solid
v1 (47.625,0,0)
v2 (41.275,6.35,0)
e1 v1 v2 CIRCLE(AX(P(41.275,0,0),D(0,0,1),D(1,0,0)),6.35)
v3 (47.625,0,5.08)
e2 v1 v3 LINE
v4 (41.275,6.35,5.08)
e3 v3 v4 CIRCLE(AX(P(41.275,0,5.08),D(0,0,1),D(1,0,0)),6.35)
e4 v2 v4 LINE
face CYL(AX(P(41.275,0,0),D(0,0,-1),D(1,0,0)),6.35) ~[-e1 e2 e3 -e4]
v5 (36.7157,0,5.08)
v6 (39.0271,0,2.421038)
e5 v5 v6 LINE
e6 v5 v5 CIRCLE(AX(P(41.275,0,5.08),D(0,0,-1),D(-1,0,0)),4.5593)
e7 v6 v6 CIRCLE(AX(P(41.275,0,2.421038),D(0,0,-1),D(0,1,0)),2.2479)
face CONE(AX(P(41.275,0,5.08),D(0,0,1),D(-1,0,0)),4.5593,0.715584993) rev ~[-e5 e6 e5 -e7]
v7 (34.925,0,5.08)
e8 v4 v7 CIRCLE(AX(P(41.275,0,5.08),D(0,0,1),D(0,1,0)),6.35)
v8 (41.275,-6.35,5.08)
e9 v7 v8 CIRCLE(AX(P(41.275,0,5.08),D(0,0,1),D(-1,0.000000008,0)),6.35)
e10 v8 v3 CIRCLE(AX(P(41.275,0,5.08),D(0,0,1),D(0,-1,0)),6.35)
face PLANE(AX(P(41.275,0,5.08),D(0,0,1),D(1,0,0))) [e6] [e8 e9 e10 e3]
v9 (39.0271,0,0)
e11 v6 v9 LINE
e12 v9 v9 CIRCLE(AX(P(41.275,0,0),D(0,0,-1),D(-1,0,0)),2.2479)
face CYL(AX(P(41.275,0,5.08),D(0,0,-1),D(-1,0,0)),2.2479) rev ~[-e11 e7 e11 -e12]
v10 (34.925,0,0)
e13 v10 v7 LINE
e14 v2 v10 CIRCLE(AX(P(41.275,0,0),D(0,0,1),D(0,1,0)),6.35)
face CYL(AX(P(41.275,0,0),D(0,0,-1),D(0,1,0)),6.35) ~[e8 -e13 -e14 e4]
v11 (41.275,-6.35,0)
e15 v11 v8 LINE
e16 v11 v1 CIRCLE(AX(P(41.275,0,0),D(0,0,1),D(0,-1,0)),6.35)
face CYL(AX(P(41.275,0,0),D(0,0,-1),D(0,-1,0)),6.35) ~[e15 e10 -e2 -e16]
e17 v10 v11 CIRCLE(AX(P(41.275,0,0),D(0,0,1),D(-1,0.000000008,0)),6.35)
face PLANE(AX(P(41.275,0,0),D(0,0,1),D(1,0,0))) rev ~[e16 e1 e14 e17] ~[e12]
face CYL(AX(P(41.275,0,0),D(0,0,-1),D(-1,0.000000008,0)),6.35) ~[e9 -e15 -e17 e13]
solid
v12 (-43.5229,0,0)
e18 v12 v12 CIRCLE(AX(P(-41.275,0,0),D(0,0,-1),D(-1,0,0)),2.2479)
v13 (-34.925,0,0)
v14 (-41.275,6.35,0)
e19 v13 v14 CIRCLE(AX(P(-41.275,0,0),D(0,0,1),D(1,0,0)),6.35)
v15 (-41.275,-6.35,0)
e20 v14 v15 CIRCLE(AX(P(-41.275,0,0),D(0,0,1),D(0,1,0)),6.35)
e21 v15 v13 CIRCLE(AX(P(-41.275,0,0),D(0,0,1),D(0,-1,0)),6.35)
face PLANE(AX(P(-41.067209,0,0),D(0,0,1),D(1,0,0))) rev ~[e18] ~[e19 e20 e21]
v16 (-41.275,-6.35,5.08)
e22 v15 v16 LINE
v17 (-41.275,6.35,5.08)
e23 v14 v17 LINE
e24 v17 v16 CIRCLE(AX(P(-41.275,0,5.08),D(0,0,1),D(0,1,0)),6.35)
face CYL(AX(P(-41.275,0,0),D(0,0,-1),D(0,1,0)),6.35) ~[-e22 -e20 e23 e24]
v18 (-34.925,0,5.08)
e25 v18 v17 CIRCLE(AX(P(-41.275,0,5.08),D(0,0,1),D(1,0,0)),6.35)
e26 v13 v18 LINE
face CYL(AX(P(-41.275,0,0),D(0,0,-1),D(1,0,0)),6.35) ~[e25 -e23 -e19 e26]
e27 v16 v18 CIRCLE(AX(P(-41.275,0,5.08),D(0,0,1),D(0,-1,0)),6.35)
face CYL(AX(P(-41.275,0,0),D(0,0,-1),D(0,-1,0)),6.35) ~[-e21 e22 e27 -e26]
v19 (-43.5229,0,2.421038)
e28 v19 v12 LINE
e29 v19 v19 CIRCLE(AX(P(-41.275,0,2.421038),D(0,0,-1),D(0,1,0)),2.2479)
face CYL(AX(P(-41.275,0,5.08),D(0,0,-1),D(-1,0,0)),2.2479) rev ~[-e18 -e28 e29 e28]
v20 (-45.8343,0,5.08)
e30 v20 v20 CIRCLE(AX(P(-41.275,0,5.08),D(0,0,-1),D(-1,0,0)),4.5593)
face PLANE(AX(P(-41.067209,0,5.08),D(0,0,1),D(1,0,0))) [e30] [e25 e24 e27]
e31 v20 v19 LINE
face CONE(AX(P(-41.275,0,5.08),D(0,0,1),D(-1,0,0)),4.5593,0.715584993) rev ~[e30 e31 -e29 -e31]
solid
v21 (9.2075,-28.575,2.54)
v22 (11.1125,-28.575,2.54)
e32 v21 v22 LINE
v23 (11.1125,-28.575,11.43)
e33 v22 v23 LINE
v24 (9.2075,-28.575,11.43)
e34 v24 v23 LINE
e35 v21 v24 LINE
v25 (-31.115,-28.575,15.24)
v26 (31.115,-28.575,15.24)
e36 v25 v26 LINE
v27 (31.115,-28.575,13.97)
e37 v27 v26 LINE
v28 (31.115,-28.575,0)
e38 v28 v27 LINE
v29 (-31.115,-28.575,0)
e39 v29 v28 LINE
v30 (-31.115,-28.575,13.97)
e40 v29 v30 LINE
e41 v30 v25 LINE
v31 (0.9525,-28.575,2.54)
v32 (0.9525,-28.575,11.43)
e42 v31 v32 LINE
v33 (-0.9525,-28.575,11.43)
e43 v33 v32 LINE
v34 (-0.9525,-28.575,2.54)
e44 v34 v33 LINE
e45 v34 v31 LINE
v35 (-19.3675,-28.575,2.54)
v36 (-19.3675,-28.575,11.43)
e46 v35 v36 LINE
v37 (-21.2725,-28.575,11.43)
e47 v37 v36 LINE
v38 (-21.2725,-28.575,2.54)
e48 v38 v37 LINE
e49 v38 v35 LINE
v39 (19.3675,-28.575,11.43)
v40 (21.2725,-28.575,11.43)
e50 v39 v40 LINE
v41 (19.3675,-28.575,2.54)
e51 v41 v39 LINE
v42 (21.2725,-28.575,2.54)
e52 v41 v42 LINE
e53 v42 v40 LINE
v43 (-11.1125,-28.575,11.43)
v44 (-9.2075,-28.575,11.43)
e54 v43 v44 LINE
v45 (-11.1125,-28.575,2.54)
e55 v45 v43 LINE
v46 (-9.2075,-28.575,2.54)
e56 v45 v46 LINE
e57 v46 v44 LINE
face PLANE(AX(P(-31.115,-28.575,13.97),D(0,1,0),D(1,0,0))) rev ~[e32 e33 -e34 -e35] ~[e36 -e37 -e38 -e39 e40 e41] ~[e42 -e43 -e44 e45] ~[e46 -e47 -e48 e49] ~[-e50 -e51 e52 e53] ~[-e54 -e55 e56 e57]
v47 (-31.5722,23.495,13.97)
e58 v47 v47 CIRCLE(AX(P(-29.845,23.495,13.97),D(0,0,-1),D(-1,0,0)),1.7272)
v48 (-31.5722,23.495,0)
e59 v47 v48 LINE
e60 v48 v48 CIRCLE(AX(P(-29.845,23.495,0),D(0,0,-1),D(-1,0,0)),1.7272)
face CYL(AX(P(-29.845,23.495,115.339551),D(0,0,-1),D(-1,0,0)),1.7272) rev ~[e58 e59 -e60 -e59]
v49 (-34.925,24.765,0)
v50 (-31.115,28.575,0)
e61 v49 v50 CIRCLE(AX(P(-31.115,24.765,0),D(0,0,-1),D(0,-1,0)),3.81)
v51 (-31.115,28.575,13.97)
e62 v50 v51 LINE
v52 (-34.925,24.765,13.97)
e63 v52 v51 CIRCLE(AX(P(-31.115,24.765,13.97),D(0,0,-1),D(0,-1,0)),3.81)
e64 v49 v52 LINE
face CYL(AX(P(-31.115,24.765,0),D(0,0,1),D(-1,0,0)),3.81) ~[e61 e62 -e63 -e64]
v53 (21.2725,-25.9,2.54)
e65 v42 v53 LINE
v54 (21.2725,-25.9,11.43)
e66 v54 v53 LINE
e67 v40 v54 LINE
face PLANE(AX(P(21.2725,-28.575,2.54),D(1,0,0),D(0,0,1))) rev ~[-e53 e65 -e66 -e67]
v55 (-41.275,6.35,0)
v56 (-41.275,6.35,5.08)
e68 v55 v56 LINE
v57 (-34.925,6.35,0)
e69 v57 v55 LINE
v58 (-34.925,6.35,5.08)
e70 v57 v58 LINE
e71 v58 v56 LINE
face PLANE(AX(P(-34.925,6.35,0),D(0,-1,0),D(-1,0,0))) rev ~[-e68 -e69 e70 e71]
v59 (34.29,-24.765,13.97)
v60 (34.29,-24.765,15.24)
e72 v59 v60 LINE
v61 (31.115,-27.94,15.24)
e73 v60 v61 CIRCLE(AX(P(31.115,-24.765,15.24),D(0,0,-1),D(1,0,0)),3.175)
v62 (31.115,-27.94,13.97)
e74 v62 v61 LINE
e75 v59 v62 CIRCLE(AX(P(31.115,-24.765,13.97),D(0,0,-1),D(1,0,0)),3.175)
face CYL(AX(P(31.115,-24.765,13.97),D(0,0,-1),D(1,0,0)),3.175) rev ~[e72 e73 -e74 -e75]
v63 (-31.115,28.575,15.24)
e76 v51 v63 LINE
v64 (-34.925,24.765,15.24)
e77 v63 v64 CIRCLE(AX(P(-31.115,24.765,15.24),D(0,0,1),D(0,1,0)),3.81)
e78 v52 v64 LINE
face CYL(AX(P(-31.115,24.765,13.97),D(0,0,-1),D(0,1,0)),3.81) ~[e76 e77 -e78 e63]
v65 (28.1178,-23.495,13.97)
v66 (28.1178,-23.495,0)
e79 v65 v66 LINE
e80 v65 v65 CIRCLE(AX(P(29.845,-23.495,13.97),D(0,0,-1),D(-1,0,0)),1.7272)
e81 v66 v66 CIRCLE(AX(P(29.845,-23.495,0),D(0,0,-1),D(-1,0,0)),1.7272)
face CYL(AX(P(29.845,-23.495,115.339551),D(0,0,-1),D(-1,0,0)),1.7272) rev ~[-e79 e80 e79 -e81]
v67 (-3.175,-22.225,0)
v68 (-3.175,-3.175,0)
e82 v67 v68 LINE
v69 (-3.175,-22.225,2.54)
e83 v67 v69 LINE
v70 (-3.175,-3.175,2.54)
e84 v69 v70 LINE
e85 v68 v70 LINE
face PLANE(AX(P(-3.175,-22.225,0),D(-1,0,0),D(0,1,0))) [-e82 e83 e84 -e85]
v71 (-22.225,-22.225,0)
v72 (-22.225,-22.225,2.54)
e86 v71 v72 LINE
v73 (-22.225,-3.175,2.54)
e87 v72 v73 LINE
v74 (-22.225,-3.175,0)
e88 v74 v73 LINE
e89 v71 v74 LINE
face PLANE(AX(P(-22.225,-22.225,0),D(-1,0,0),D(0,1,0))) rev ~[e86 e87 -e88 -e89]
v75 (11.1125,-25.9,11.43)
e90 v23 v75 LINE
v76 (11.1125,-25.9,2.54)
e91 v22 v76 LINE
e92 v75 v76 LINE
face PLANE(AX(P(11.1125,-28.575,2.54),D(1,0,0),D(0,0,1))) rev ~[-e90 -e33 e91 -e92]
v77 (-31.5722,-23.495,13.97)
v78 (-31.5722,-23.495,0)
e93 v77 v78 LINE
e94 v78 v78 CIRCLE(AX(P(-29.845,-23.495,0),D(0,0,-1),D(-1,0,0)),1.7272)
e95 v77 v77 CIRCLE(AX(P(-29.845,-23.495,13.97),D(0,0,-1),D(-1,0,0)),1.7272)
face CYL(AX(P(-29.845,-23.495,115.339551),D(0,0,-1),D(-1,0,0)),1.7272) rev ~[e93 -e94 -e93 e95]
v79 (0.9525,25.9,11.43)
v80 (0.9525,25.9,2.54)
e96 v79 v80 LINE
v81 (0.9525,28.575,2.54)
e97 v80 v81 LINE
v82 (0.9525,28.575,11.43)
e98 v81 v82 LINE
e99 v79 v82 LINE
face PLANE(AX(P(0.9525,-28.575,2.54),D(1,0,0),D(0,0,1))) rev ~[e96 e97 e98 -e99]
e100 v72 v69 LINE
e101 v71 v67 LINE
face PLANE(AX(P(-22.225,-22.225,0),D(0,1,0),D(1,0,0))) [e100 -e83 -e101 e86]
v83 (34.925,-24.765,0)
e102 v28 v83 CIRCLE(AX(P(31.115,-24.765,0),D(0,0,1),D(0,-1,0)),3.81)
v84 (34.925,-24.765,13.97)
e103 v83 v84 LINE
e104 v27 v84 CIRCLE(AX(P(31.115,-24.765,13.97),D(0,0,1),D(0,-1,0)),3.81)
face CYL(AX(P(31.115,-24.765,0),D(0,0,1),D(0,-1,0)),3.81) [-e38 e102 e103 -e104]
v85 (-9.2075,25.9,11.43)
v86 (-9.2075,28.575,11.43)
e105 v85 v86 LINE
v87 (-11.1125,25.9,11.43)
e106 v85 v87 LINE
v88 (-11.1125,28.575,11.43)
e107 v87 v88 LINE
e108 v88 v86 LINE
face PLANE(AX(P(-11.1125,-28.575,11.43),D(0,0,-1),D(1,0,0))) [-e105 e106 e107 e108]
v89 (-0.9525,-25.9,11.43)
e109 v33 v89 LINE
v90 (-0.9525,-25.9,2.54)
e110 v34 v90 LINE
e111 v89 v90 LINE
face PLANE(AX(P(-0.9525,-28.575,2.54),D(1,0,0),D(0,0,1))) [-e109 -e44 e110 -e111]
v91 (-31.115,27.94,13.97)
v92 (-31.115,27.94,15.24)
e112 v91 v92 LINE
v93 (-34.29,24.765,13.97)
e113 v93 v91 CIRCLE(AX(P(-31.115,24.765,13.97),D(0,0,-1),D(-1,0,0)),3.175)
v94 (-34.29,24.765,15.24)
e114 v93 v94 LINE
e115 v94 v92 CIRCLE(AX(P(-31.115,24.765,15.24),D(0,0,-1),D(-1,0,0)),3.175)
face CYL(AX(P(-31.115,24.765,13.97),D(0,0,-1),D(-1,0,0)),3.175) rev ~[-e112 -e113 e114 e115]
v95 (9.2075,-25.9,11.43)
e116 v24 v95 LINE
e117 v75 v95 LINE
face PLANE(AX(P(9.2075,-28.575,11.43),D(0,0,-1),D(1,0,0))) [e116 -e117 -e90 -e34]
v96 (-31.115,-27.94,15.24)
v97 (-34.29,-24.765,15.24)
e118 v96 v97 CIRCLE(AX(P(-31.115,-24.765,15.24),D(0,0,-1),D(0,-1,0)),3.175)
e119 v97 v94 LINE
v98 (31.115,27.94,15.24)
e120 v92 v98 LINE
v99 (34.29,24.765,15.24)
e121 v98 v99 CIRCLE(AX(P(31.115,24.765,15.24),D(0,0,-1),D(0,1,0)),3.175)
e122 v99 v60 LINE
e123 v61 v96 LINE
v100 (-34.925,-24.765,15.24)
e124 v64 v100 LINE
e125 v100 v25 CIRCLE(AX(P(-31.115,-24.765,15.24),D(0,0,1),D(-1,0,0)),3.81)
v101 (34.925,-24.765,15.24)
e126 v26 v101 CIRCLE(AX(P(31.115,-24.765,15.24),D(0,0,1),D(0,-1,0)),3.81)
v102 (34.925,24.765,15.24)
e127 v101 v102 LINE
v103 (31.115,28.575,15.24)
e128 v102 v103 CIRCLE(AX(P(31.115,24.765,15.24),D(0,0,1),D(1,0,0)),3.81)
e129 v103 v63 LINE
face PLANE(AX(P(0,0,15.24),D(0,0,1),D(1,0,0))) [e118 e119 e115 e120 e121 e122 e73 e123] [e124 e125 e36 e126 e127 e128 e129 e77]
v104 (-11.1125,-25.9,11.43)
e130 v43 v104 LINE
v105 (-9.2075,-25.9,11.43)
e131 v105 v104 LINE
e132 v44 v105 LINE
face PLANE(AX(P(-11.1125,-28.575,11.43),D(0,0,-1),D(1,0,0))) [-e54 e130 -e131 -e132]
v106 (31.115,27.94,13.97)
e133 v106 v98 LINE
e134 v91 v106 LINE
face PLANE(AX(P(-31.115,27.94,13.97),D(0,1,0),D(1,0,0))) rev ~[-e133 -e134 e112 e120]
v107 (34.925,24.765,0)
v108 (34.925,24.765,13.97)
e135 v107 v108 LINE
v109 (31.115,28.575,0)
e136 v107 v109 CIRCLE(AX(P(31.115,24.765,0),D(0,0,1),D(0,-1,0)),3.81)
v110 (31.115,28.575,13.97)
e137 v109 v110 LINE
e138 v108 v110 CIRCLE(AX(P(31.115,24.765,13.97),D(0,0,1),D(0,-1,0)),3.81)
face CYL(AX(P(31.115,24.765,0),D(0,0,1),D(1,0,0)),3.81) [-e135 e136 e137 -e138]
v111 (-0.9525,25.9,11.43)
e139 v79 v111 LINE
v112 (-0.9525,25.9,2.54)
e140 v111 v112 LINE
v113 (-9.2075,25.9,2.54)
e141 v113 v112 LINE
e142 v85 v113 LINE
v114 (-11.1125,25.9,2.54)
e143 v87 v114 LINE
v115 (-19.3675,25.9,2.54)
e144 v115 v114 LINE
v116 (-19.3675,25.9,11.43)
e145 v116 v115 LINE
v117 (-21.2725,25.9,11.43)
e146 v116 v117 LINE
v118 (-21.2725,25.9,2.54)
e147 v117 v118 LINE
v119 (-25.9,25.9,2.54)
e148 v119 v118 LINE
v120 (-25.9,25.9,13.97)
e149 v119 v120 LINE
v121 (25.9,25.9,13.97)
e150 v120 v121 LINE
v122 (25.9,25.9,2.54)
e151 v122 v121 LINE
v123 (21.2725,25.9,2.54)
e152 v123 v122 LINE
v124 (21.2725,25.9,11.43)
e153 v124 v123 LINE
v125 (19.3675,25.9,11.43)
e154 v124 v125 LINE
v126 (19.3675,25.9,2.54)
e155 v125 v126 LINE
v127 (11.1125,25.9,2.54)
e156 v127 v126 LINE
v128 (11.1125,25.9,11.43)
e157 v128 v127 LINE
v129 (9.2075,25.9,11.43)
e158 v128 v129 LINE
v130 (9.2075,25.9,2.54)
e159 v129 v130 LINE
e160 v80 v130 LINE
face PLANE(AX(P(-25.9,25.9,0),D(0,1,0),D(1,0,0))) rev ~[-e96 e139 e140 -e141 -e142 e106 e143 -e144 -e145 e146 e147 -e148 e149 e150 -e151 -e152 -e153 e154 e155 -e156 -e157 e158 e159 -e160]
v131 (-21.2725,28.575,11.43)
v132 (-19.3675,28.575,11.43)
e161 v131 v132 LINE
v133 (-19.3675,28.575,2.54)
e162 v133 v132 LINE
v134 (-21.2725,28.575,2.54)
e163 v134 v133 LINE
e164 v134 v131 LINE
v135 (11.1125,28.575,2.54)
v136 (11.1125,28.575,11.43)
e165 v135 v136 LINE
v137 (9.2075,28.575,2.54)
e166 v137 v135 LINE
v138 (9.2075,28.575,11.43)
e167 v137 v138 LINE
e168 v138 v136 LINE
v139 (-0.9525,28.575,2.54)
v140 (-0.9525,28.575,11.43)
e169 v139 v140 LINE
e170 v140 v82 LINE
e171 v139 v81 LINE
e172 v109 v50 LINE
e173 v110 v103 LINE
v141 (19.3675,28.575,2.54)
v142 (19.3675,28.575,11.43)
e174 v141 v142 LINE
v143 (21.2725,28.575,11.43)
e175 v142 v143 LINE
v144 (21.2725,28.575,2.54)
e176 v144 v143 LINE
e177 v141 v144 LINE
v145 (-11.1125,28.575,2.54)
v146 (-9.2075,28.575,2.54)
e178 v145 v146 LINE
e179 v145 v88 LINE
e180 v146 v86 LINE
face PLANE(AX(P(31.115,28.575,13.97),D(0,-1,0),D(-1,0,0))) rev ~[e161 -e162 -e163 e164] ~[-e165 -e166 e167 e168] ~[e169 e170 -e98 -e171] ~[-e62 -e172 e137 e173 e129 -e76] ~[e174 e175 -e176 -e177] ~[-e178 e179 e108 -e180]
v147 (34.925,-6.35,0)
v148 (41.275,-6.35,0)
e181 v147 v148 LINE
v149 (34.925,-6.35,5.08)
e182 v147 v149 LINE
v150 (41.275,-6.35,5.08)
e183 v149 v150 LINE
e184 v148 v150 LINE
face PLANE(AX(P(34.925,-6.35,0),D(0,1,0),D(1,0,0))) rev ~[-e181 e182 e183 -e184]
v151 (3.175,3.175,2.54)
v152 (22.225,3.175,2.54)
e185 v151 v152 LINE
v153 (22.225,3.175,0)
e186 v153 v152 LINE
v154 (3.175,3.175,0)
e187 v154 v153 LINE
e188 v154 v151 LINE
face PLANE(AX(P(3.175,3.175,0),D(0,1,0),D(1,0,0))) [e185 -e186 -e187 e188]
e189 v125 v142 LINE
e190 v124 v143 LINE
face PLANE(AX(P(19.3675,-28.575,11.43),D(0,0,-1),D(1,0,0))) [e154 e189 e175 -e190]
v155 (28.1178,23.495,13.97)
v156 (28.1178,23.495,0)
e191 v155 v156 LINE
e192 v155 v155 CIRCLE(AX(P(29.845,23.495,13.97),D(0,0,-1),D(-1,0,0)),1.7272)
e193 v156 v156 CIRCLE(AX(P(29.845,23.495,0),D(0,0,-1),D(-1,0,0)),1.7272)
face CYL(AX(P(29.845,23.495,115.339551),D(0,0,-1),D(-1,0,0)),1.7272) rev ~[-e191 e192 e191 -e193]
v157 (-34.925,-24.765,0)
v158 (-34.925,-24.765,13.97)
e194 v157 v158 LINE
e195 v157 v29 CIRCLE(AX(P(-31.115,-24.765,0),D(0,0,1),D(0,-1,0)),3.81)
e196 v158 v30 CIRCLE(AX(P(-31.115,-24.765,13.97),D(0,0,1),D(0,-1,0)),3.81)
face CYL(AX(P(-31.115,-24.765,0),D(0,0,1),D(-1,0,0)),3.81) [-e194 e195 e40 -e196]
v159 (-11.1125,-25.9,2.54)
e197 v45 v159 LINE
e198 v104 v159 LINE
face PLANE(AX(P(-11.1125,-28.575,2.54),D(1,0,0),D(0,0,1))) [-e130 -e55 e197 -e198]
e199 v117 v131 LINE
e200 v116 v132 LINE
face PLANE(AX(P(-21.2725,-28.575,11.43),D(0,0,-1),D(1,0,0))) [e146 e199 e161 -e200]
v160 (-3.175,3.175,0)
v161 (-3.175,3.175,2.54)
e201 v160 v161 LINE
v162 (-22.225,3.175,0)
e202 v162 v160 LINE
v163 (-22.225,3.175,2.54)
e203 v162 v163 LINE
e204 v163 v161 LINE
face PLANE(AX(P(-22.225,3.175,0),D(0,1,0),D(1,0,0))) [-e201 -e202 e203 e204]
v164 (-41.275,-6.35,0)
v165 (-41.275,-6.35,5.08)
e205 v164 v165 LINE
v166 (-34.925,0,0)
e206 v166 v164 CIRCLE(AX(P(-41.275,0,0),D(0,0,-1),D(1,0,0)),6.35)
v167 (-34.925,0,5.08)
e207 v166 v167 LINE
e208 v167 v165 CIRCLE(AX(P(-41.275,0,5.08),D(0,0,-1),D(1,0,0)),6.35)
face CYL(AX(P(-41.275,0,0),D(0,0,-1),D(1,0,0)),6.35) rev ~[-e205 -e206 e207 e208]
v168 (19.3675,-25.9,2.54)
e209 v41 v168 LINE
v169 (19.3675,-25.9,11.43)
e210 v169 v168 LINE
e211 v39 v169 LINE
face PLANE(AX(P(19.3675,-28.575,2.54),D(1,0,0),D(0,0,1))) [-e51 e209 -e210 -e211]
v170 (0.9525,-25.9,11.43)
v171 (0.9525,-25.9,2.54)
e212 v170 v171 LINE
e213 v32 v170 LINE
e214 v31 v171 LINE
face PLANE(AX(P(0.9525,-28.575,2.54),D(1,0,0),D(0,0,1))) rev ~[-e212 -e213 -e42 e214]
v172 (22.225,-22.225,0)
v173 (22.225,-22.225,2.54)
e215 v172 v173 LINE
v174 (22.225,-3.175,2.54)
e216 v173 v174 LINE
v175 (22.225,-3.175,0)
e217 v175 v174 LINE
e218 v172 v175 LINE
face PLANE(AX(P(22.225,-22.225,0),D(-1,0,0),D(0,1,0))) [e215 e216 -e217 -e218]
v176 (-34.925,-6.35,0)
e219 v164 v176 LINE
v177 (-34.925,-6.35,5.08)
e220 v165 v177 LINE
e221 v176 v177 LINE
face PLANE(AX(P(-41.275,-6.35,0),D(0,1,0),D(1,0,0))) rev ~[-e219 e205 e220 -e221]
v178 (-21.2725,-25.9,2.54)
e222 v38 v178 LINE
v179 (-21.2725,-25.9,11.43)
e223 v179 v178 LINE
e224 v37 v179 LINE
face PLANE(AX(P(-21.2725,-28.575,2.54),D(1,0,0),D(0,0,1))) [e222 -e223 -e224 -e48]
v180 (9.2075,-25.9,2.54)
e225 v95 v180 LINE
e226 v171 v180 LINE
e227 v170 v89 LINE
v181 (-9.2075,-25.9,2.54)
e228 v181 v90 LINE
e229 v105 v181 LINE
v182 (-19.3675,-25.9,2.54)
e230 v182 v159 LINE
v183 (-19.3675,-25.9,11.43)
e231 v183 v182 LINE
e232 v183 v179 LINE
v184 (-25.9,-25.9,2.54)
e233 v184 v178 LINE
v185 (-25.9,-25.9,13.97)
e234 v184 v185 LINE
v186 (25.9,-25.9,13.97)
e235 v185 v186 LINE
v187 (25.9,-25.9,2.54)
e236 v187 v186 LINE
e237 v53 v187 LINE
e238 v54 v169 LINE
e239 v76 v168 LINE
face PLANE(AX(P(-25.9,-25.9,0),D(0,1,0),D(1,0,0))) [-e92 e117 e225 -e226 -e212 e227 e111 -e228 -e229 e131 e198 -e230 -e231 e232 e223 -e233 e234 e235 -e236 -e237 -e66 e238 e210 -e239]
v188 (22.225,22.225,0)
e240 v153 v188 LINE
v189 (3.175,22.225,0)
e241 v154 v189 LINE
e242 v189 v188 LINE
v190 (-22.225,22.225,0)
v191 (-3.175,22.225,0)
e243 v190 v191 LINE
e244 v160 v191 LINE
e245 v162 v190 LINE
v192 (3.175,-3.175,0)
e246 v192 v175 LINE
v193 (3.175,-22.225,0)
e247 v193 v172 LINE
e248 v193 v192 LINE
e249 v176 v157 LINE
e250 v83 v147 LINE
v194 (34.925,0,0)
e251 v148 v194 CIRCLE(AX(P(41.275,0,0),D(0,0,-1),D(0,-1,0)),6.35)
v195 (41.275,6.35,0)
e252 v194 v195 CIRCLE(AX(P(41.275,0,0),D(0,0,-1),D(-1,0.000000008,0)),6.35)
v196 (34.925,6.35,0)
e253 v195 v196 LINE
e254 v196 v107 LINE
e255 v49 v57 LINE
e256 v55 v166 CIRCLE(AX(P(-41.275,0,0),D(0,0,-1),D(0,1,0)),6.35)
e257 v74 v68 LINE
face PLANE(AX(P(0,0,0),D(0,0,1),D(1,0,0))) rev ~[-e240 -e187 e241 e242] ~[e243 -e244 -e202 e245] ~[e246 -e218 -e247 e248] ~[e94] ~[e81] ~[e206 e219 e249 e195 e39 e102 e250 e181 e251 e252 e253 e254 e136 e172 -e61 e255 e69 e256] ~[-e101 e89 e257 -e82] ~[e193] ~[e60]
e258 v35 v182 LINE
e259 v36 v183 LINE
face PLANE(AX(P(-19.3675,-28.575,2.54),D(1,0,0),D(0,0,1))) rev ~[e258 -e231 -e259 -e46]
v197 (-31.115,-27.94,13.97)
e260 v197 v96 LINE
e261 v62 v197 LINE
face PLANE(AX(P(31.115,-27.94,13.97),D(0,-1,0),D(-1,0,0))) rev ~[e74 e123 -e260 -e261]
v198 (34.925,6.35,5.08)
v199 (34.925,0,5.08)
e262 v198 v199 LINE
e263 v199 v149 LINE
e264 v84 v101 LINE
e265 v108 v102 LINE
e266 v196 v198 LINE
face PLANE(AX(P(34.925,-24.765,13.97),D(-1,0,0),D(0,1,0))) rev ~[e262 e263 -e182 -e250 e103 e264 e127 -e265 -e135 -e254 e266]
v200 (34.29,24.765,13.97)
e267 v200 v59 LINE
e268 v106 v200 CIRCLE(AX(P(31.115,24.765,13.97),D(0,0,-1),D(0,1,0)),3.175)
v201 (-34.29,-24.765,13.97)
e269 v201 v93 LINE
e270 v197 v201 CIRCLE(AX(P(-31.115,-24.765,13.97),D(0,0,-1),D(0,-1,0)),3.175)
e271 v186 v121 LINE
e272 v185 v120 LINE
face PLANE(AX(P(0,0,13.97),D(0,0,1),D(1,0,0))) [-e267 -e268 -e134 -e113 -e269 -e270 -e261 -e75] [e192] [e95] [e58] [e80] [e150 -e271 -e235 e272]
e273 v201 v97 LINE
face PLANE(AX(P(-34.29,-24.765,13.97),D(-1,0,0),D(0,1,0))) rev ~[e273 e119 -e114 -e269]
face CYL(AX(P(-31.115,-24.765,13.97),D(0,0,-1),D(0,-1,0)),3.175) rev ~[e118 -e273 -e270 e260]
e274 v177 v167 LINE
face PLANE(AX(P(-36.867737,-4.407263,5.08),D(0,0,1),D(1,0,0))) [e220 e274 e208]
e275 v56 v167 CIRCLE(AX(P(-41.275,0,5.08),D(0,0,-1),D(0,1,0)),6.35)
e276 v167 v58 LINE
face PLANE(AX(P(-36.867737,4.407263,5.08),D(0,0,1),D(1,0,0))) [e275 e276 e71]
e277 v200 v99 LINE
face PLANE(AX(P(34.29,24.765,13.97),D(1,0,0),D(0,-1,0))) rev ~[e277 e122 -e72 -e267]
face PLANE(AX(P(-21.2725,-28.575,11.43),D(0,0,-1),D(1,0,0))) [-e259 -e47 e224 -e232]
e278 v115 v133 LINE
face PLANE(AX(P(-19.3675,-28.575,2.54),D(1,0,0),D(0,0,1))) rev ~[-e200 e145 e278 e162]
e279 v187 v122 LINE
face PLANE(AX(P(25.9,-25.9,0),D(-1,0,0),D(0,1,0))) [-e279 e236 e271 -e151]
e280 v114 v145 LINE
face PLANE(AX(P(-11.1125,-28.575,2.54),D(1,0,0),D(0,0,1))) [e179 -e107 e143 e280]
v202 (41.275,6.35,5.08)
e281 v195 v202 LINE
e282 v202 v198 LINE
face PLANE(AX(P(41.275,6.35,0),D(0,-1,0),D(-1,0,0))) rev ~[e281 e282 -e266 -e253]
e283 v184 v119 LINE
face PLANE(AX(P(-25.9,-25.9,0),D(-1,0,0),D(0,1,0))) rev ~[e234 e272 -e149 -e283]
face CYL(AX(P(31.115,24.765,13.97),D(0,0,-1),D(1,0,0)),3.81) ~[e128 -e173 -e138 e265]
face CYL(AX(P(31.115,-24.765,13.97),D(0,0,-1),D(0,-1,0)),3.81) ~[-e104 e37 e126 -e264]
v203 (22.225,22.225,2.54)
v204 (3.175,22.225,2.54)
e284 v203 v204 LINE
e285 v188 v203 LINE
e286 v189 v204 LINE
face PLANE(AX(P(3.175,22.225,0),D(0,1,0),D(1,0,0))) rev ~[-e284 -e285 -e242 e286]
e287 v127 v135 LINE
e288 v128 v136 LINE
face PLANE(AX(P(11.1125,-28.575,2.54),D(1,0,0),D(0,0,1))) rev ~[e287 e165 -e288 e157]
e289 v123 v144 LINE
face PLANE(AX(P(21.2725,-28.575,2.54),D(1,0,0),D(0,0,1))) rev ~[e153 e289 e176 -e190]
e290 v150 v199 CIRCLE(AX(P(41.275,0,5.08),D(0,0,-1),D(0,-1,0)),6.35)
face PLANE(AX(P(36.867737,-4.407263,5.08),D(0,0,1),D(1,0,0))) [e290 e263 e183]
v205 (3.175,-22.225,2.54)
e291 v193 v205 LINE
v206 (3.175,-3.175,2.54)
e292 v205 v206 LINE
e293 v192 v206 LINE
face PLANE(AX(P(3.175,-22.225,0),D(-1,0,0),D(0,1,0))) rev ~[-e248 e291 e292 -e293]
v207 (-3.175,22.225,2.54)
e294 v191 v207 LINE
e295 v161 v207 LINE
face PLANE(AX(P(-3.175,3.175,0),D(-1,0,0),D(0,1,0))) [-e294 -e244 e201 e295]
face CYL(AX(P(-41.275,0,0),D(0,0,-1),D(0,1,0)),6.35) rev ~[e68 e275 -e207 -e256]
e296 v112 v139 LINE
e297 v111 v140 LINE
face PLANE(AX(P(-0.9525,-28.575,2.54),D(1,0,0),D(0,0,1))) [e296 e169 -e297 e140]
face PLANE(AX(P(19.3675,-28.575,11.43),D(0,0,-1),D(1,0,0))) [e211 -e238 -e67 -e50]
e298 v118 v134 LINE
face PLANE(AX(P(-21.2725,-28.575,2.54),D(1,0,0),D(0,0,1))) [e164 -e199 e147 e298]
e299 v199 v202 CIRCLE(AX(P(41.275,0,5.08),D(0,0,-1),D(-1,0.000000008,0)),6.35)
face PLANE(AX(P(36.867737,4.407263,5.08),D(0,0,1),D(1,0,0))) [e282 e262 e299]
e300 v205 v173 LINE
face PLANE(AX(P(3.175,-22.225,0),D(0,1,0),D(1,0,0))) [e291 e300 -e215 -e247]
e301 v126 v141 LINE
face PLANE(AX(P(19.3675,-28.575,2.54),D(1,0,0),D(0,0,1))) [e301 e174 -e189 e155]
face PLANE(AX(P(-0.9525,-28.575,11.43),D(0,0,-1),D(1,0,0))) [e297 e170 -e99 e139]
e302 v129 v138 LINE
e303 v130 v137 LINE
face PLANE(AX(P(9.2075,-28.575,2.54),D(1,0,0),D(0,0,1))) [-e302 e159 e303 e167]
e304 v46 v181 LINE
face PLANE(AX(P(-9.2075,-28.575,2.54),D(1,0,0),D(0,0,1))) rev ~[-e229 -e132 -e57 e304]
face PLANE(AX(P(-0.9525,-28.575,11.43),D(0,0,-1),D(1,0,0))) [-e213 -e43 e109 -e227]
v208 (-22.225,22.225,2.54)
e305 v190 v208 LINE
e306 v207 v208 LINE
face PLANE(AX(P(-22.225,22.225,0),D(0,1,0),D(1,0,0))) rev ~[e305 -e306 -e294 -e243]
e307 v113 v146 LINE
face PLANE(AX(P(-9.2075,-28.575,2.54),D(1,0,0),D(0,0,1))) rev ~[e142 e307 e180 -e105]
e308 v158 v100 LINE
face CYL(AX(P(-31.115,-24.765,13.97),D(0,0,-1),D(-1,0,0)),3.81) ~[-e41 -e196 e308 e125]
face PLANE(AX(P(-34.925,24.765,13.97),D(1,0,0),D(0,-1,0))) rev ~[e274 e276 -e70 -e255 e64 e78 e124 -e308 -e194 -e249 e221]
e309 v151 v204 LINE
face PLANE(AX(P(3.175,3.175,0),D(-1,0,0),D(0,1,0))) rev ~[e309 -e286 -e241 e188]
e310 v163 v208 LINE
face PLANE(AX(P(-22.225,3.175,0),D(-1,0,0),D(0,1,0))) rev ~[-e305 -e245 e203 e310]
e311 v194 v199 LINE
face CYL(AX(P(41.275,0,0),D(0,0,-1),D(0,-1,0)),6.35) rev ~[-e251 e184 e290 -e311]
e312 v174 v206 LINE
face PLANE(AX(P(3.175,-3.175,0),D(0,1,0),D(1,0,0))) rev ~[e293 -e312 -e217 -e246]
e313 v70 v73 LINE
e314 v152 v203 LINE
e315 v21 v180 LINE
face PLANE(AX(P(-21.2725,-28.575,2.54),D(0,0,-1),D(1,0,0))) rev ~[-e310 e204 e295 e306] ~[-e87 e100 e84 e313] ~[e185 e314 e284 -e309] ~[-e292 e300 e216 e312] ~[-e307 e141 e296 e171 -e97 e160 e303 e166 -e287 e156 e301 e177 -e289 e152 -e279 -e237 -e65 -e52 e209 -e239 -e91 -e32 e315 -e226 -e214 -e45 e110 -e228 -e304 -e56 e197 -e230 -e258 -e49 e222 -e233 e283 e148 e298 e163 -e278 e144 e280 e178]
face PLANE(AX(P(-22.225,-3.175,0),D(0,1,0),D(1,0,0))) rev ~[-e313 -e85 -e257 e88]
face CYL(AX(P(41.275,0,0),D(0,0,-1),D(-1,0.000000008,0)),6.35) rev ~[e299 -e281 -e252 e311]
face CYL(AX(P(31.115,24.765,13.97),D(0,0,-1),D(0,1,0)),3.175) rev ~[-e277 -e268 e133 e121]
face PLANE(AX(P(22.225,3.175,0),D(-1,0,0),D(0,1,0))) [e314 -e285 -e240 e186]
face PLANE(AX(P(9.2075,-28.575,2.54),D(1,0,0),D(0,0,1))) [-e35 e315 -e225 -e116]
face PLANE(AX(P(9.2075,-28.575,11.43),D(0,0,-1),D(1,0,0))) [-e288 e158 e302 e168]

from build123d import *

# Parameters (mm, degrees)
F0_W              = 51.8
F0_H              = 51.8
F1_DEPTH          = 13.97
F2_DEPTH          = 5.08
F0_W_2            = 19.05
F0_H_2            = 19.05
F3_DEPTH          = 2.54
F4_R              = 3.81
F7_D              = 3.4544
F9_W              = 1.905
F9_H              = 8.89
F10_DEPTH         = 57.15
F11_DEPTH         = 5.08
F14_D             = 4.4958
F14_CSINK_D       = 9.1186
F14_CSINK_ANGLE   = 82
F14_2_D           = 4.4958
F14_2_CSINK_D     = 9.1186
F14_2_CSINK_ANGLE = 82
F16_DEPTH         = 1.27


# Not quite as in the source:
# - a feature names something its author has since deleted; it is built from what else it names


with BuildPart() as f1:
    # F0 (on Top) → F1 (new body)
    with BuildSketch(Plane.XY):
        Polygon((-34.925, -28.575), (34.925, -28.575), (34.925, -6.35), (34.925, 4.95e-08), (34.925, 6.35), (34.925, 28.575), (-34.925, 28.575), (-34.925, 6.35), (-34.925, 0), (-34.925, -6.35), align=None)
        Rectangle(F0_W, F0_H, mode=Mode.SUBTRACT)
    extrude(amount=F1_DEPTH)

    # F0 (on Top) → F2 (join)
    with BuildSketch(Plane.XY):
        with BuildLine():
            ThreePointArc((-41.275, 6.35), (-36.7848719395, 4.4901280605), (-34.925, 0))
            Line((-34.925, 0), (-34.925, 6.35))
            Line((-34.925, 6.35), (-41.275, 6.35))
        make_face()
        with BuildLine():
            Line((34.925, 6.35), (34.925, 4.95e-08))
            ThreePointArc((34.925, 4.95e-08), (36.784871957, 4.490128078), (41.275, 6.35))
            Line((41.275, 6.35), (34.925, 6.35))
        make_face()
        with BuildLine():
            Line((34.925, 4.95e-08), (34.925, -6.35))
            Line((34.925, -6.35), (41.275, -6.35))
            ThreePointArc((41.275, -6.35), (36.784871922, -4.490128043), (34.925, 4.95e-08))
        make_face()
        with BuildLine():
            Line((-41.275, -6.35), (-34.925, -6.35))
            Line((-34.925, -6.35), (-34.925, 0))
            ThreePointArc((-34.925, 0), (-36.7848719395, -4.4901280605), (-41.275, -6.35))
        make_face()
    extrude(amount=F2_DEPTH)

    # F0 (on Top) → F3 (join)
    with BuildSketch(Plane.XY):
        Rectangle(F0_W, F0_H)
        with Locations((-12.7, -12.7)):
            Rectangle(F0_W_2, F0_H_2, mode=Mode.SUBTRACT)
        with Locations((12.7, -12.7)):
            Rectangle(F0_W_2, F0_H_2, mode=Mode.SUBTRACT)
        with Locations((-12.7, 12.7)):
            Rectangle(F0_W_2, F0_H_2, mode=Mode.SUBTRACT)
        with Locations((12.7, 12.7)):
            Rectangle(F0_W_2, F0_H_2, mode=Mode.SUBTRACT)
    extrude(amount=F3_DEPTH)

    # F4
    f4_edges = [f1.edges().sort_by_distance(p)[0] for p in [
        (-34.925, -28.575, 6.985),
        (34.925, 28.575, 6.985),
        (34.925, -28.575, 6.985),
        (-34.925, 28.575, 6.985),
    ]]
    fillet(f4_edges, radius=F4_R)

    # F7 (through all)
    with Locations(Plane.XY.offset(13.97)):
        with Locations((-29.845, 23.495), (-29.845, -23.495), (29.845, -23.495), (29.845, 23.495)):
            Hole(F7_D / 2)

    # F9 (on offset) → F10 (cut)
    with BuildSketch(Plane.XZ.offset(28.575)):
        with Locations((10.16, 6.985)):
            Rectangle(F9_W, F9_H)
        with Locations((0, 6.985)):
            Rectangle(F9_W, F9_H)
        with Locations((-20.3200003028, 6.985)):
            Rectangle(F9_W, F9_H)
        with Locations((-10.1600001514, 6.985)):
            Rectangle(F9_W, F9_H)
        with Locations((20.32, 6.985)):
            Rectangle(F9_W, F9_H)
    extrude(amount=-F10_DEPTH, mode=Mode.SUBTRACT)

    # F15 (on face) → F16 (join)
    with BuildSketch(Plane.XY.offset(13.97)):
        with BuildLine():
            ThreePointArc((-34.925, -24.765), (-33.8090768363, -27.4590768363), (-31.115, -28.575))
            Line((-31.115, -28.575), (31.115, -28.575))
            ThreePointArc((31.115, -28.575), (33.8090768363, -27.4590768363), (34.925, -24.765))
            Line((34.925, -24.765), (34.925, 24.765))
            ThreePointArc((34.925, 24.765), (33.8090768363, 27.4590768363), (31.115, 28.575))
            Line((31.115, 28.575), (-31.115, 28.575))
            ThreePointArc((-31.115, 28.575), (-33.8090768363, 27.4590768363), (-34.925, 24.765))
            Line((-34.925, 24.765), (-34.925, -24.765))
        make_face()
        with BuildLine():
            Line((34.29, 24.765), (34.29, -24.765))
            ThreePointArc((34.29, -24.765), (33.3600640303, -27.0100640303), (31.115, -27.94))
            Line((31.115, -27.94), (-31.115, -27.94))
            ThreePointArc((-31.115, -27.94), (-33.3600640303, -27.0100640303), (-34.29, -24.765))
            Line((-34.29, -24.765), (-34.29, 24.765))
            ThreePointArc((-34.29, 24.765), (-33.3600640303, 27.0100640303), (-31.115, 27.94))
            Line((-31.115, 27.94), (31.115, 27.94))
            ThreePointArc((31.115, 27.94), (33.3600640303, 27.0100640303), (34.29, 24.765))
        make_face(mode=Mode.SUBTRACT)
    extrude(amount=F16_DEPTH)


with BuildPart() as f11:
    # F0 (on Top) → F11 (new body)
    with BuildSketch(Plane.XY):
        with BuildLine():
            ThreePointArc((41.275, 6.35), (36.784871957, 4.490128078), (34.925, 4.95e-08))
            ThreePointArc((34.925, 4.95e-08), (36.784871922, -4.490128043), (41.275, -6.35))
            ThreePointArc((41.275, -6.35), (45.7651280605, -4.4901280605), (47.625, 0))
            ThreePointArc((47.625, 0), (45.7651280605, 4.4901280605), (41.275, 6.35))
        make_face()
    extrude(amount=F11_DEPTH)

    # F14 (through all)
    with Locations(Plane.XY.offset(5.08)):
        with Locations((-41.275, 0), (41.275, 0)):
            CounterSinkHole(F14_D / 2, F14_CSINK_D / 2, counter_sink_angle=F14_CSINK_ANGLE)


with BuildPart() as f11b:
    # F0 (on Top) → F11, piece 2 (new body)
    with BuildSketch(Plane.XY):
        with BuildLine():
            ThreePointArc((-41.275, -6.35), (-36.7848719395, -4.4901280605), (-34.925, 0))
            ThreePointArc((-34.925, 0), (-36.7848719395, 4.4901280605), (-41.275, 6.35))
            ThreePointArc((-41.275, 6.35), (-47.625, 0), (-41.275, -6.35))
        make_face()
    extrude(amount=F11_DEPTH)

    # F14#2 (through all)
    with Locations(Plane.XY.offset(5.08)):
        with Locations((-41.275, 0), (41.275, 0)):
            CounterSinkHole(F14_2_D / 2, F14_2_CSINK_D / 2, counter_sink_angle=F14_2_CSINK_ANGLE)


solid = Compound([f1.part, f11.part, f11b.part])
